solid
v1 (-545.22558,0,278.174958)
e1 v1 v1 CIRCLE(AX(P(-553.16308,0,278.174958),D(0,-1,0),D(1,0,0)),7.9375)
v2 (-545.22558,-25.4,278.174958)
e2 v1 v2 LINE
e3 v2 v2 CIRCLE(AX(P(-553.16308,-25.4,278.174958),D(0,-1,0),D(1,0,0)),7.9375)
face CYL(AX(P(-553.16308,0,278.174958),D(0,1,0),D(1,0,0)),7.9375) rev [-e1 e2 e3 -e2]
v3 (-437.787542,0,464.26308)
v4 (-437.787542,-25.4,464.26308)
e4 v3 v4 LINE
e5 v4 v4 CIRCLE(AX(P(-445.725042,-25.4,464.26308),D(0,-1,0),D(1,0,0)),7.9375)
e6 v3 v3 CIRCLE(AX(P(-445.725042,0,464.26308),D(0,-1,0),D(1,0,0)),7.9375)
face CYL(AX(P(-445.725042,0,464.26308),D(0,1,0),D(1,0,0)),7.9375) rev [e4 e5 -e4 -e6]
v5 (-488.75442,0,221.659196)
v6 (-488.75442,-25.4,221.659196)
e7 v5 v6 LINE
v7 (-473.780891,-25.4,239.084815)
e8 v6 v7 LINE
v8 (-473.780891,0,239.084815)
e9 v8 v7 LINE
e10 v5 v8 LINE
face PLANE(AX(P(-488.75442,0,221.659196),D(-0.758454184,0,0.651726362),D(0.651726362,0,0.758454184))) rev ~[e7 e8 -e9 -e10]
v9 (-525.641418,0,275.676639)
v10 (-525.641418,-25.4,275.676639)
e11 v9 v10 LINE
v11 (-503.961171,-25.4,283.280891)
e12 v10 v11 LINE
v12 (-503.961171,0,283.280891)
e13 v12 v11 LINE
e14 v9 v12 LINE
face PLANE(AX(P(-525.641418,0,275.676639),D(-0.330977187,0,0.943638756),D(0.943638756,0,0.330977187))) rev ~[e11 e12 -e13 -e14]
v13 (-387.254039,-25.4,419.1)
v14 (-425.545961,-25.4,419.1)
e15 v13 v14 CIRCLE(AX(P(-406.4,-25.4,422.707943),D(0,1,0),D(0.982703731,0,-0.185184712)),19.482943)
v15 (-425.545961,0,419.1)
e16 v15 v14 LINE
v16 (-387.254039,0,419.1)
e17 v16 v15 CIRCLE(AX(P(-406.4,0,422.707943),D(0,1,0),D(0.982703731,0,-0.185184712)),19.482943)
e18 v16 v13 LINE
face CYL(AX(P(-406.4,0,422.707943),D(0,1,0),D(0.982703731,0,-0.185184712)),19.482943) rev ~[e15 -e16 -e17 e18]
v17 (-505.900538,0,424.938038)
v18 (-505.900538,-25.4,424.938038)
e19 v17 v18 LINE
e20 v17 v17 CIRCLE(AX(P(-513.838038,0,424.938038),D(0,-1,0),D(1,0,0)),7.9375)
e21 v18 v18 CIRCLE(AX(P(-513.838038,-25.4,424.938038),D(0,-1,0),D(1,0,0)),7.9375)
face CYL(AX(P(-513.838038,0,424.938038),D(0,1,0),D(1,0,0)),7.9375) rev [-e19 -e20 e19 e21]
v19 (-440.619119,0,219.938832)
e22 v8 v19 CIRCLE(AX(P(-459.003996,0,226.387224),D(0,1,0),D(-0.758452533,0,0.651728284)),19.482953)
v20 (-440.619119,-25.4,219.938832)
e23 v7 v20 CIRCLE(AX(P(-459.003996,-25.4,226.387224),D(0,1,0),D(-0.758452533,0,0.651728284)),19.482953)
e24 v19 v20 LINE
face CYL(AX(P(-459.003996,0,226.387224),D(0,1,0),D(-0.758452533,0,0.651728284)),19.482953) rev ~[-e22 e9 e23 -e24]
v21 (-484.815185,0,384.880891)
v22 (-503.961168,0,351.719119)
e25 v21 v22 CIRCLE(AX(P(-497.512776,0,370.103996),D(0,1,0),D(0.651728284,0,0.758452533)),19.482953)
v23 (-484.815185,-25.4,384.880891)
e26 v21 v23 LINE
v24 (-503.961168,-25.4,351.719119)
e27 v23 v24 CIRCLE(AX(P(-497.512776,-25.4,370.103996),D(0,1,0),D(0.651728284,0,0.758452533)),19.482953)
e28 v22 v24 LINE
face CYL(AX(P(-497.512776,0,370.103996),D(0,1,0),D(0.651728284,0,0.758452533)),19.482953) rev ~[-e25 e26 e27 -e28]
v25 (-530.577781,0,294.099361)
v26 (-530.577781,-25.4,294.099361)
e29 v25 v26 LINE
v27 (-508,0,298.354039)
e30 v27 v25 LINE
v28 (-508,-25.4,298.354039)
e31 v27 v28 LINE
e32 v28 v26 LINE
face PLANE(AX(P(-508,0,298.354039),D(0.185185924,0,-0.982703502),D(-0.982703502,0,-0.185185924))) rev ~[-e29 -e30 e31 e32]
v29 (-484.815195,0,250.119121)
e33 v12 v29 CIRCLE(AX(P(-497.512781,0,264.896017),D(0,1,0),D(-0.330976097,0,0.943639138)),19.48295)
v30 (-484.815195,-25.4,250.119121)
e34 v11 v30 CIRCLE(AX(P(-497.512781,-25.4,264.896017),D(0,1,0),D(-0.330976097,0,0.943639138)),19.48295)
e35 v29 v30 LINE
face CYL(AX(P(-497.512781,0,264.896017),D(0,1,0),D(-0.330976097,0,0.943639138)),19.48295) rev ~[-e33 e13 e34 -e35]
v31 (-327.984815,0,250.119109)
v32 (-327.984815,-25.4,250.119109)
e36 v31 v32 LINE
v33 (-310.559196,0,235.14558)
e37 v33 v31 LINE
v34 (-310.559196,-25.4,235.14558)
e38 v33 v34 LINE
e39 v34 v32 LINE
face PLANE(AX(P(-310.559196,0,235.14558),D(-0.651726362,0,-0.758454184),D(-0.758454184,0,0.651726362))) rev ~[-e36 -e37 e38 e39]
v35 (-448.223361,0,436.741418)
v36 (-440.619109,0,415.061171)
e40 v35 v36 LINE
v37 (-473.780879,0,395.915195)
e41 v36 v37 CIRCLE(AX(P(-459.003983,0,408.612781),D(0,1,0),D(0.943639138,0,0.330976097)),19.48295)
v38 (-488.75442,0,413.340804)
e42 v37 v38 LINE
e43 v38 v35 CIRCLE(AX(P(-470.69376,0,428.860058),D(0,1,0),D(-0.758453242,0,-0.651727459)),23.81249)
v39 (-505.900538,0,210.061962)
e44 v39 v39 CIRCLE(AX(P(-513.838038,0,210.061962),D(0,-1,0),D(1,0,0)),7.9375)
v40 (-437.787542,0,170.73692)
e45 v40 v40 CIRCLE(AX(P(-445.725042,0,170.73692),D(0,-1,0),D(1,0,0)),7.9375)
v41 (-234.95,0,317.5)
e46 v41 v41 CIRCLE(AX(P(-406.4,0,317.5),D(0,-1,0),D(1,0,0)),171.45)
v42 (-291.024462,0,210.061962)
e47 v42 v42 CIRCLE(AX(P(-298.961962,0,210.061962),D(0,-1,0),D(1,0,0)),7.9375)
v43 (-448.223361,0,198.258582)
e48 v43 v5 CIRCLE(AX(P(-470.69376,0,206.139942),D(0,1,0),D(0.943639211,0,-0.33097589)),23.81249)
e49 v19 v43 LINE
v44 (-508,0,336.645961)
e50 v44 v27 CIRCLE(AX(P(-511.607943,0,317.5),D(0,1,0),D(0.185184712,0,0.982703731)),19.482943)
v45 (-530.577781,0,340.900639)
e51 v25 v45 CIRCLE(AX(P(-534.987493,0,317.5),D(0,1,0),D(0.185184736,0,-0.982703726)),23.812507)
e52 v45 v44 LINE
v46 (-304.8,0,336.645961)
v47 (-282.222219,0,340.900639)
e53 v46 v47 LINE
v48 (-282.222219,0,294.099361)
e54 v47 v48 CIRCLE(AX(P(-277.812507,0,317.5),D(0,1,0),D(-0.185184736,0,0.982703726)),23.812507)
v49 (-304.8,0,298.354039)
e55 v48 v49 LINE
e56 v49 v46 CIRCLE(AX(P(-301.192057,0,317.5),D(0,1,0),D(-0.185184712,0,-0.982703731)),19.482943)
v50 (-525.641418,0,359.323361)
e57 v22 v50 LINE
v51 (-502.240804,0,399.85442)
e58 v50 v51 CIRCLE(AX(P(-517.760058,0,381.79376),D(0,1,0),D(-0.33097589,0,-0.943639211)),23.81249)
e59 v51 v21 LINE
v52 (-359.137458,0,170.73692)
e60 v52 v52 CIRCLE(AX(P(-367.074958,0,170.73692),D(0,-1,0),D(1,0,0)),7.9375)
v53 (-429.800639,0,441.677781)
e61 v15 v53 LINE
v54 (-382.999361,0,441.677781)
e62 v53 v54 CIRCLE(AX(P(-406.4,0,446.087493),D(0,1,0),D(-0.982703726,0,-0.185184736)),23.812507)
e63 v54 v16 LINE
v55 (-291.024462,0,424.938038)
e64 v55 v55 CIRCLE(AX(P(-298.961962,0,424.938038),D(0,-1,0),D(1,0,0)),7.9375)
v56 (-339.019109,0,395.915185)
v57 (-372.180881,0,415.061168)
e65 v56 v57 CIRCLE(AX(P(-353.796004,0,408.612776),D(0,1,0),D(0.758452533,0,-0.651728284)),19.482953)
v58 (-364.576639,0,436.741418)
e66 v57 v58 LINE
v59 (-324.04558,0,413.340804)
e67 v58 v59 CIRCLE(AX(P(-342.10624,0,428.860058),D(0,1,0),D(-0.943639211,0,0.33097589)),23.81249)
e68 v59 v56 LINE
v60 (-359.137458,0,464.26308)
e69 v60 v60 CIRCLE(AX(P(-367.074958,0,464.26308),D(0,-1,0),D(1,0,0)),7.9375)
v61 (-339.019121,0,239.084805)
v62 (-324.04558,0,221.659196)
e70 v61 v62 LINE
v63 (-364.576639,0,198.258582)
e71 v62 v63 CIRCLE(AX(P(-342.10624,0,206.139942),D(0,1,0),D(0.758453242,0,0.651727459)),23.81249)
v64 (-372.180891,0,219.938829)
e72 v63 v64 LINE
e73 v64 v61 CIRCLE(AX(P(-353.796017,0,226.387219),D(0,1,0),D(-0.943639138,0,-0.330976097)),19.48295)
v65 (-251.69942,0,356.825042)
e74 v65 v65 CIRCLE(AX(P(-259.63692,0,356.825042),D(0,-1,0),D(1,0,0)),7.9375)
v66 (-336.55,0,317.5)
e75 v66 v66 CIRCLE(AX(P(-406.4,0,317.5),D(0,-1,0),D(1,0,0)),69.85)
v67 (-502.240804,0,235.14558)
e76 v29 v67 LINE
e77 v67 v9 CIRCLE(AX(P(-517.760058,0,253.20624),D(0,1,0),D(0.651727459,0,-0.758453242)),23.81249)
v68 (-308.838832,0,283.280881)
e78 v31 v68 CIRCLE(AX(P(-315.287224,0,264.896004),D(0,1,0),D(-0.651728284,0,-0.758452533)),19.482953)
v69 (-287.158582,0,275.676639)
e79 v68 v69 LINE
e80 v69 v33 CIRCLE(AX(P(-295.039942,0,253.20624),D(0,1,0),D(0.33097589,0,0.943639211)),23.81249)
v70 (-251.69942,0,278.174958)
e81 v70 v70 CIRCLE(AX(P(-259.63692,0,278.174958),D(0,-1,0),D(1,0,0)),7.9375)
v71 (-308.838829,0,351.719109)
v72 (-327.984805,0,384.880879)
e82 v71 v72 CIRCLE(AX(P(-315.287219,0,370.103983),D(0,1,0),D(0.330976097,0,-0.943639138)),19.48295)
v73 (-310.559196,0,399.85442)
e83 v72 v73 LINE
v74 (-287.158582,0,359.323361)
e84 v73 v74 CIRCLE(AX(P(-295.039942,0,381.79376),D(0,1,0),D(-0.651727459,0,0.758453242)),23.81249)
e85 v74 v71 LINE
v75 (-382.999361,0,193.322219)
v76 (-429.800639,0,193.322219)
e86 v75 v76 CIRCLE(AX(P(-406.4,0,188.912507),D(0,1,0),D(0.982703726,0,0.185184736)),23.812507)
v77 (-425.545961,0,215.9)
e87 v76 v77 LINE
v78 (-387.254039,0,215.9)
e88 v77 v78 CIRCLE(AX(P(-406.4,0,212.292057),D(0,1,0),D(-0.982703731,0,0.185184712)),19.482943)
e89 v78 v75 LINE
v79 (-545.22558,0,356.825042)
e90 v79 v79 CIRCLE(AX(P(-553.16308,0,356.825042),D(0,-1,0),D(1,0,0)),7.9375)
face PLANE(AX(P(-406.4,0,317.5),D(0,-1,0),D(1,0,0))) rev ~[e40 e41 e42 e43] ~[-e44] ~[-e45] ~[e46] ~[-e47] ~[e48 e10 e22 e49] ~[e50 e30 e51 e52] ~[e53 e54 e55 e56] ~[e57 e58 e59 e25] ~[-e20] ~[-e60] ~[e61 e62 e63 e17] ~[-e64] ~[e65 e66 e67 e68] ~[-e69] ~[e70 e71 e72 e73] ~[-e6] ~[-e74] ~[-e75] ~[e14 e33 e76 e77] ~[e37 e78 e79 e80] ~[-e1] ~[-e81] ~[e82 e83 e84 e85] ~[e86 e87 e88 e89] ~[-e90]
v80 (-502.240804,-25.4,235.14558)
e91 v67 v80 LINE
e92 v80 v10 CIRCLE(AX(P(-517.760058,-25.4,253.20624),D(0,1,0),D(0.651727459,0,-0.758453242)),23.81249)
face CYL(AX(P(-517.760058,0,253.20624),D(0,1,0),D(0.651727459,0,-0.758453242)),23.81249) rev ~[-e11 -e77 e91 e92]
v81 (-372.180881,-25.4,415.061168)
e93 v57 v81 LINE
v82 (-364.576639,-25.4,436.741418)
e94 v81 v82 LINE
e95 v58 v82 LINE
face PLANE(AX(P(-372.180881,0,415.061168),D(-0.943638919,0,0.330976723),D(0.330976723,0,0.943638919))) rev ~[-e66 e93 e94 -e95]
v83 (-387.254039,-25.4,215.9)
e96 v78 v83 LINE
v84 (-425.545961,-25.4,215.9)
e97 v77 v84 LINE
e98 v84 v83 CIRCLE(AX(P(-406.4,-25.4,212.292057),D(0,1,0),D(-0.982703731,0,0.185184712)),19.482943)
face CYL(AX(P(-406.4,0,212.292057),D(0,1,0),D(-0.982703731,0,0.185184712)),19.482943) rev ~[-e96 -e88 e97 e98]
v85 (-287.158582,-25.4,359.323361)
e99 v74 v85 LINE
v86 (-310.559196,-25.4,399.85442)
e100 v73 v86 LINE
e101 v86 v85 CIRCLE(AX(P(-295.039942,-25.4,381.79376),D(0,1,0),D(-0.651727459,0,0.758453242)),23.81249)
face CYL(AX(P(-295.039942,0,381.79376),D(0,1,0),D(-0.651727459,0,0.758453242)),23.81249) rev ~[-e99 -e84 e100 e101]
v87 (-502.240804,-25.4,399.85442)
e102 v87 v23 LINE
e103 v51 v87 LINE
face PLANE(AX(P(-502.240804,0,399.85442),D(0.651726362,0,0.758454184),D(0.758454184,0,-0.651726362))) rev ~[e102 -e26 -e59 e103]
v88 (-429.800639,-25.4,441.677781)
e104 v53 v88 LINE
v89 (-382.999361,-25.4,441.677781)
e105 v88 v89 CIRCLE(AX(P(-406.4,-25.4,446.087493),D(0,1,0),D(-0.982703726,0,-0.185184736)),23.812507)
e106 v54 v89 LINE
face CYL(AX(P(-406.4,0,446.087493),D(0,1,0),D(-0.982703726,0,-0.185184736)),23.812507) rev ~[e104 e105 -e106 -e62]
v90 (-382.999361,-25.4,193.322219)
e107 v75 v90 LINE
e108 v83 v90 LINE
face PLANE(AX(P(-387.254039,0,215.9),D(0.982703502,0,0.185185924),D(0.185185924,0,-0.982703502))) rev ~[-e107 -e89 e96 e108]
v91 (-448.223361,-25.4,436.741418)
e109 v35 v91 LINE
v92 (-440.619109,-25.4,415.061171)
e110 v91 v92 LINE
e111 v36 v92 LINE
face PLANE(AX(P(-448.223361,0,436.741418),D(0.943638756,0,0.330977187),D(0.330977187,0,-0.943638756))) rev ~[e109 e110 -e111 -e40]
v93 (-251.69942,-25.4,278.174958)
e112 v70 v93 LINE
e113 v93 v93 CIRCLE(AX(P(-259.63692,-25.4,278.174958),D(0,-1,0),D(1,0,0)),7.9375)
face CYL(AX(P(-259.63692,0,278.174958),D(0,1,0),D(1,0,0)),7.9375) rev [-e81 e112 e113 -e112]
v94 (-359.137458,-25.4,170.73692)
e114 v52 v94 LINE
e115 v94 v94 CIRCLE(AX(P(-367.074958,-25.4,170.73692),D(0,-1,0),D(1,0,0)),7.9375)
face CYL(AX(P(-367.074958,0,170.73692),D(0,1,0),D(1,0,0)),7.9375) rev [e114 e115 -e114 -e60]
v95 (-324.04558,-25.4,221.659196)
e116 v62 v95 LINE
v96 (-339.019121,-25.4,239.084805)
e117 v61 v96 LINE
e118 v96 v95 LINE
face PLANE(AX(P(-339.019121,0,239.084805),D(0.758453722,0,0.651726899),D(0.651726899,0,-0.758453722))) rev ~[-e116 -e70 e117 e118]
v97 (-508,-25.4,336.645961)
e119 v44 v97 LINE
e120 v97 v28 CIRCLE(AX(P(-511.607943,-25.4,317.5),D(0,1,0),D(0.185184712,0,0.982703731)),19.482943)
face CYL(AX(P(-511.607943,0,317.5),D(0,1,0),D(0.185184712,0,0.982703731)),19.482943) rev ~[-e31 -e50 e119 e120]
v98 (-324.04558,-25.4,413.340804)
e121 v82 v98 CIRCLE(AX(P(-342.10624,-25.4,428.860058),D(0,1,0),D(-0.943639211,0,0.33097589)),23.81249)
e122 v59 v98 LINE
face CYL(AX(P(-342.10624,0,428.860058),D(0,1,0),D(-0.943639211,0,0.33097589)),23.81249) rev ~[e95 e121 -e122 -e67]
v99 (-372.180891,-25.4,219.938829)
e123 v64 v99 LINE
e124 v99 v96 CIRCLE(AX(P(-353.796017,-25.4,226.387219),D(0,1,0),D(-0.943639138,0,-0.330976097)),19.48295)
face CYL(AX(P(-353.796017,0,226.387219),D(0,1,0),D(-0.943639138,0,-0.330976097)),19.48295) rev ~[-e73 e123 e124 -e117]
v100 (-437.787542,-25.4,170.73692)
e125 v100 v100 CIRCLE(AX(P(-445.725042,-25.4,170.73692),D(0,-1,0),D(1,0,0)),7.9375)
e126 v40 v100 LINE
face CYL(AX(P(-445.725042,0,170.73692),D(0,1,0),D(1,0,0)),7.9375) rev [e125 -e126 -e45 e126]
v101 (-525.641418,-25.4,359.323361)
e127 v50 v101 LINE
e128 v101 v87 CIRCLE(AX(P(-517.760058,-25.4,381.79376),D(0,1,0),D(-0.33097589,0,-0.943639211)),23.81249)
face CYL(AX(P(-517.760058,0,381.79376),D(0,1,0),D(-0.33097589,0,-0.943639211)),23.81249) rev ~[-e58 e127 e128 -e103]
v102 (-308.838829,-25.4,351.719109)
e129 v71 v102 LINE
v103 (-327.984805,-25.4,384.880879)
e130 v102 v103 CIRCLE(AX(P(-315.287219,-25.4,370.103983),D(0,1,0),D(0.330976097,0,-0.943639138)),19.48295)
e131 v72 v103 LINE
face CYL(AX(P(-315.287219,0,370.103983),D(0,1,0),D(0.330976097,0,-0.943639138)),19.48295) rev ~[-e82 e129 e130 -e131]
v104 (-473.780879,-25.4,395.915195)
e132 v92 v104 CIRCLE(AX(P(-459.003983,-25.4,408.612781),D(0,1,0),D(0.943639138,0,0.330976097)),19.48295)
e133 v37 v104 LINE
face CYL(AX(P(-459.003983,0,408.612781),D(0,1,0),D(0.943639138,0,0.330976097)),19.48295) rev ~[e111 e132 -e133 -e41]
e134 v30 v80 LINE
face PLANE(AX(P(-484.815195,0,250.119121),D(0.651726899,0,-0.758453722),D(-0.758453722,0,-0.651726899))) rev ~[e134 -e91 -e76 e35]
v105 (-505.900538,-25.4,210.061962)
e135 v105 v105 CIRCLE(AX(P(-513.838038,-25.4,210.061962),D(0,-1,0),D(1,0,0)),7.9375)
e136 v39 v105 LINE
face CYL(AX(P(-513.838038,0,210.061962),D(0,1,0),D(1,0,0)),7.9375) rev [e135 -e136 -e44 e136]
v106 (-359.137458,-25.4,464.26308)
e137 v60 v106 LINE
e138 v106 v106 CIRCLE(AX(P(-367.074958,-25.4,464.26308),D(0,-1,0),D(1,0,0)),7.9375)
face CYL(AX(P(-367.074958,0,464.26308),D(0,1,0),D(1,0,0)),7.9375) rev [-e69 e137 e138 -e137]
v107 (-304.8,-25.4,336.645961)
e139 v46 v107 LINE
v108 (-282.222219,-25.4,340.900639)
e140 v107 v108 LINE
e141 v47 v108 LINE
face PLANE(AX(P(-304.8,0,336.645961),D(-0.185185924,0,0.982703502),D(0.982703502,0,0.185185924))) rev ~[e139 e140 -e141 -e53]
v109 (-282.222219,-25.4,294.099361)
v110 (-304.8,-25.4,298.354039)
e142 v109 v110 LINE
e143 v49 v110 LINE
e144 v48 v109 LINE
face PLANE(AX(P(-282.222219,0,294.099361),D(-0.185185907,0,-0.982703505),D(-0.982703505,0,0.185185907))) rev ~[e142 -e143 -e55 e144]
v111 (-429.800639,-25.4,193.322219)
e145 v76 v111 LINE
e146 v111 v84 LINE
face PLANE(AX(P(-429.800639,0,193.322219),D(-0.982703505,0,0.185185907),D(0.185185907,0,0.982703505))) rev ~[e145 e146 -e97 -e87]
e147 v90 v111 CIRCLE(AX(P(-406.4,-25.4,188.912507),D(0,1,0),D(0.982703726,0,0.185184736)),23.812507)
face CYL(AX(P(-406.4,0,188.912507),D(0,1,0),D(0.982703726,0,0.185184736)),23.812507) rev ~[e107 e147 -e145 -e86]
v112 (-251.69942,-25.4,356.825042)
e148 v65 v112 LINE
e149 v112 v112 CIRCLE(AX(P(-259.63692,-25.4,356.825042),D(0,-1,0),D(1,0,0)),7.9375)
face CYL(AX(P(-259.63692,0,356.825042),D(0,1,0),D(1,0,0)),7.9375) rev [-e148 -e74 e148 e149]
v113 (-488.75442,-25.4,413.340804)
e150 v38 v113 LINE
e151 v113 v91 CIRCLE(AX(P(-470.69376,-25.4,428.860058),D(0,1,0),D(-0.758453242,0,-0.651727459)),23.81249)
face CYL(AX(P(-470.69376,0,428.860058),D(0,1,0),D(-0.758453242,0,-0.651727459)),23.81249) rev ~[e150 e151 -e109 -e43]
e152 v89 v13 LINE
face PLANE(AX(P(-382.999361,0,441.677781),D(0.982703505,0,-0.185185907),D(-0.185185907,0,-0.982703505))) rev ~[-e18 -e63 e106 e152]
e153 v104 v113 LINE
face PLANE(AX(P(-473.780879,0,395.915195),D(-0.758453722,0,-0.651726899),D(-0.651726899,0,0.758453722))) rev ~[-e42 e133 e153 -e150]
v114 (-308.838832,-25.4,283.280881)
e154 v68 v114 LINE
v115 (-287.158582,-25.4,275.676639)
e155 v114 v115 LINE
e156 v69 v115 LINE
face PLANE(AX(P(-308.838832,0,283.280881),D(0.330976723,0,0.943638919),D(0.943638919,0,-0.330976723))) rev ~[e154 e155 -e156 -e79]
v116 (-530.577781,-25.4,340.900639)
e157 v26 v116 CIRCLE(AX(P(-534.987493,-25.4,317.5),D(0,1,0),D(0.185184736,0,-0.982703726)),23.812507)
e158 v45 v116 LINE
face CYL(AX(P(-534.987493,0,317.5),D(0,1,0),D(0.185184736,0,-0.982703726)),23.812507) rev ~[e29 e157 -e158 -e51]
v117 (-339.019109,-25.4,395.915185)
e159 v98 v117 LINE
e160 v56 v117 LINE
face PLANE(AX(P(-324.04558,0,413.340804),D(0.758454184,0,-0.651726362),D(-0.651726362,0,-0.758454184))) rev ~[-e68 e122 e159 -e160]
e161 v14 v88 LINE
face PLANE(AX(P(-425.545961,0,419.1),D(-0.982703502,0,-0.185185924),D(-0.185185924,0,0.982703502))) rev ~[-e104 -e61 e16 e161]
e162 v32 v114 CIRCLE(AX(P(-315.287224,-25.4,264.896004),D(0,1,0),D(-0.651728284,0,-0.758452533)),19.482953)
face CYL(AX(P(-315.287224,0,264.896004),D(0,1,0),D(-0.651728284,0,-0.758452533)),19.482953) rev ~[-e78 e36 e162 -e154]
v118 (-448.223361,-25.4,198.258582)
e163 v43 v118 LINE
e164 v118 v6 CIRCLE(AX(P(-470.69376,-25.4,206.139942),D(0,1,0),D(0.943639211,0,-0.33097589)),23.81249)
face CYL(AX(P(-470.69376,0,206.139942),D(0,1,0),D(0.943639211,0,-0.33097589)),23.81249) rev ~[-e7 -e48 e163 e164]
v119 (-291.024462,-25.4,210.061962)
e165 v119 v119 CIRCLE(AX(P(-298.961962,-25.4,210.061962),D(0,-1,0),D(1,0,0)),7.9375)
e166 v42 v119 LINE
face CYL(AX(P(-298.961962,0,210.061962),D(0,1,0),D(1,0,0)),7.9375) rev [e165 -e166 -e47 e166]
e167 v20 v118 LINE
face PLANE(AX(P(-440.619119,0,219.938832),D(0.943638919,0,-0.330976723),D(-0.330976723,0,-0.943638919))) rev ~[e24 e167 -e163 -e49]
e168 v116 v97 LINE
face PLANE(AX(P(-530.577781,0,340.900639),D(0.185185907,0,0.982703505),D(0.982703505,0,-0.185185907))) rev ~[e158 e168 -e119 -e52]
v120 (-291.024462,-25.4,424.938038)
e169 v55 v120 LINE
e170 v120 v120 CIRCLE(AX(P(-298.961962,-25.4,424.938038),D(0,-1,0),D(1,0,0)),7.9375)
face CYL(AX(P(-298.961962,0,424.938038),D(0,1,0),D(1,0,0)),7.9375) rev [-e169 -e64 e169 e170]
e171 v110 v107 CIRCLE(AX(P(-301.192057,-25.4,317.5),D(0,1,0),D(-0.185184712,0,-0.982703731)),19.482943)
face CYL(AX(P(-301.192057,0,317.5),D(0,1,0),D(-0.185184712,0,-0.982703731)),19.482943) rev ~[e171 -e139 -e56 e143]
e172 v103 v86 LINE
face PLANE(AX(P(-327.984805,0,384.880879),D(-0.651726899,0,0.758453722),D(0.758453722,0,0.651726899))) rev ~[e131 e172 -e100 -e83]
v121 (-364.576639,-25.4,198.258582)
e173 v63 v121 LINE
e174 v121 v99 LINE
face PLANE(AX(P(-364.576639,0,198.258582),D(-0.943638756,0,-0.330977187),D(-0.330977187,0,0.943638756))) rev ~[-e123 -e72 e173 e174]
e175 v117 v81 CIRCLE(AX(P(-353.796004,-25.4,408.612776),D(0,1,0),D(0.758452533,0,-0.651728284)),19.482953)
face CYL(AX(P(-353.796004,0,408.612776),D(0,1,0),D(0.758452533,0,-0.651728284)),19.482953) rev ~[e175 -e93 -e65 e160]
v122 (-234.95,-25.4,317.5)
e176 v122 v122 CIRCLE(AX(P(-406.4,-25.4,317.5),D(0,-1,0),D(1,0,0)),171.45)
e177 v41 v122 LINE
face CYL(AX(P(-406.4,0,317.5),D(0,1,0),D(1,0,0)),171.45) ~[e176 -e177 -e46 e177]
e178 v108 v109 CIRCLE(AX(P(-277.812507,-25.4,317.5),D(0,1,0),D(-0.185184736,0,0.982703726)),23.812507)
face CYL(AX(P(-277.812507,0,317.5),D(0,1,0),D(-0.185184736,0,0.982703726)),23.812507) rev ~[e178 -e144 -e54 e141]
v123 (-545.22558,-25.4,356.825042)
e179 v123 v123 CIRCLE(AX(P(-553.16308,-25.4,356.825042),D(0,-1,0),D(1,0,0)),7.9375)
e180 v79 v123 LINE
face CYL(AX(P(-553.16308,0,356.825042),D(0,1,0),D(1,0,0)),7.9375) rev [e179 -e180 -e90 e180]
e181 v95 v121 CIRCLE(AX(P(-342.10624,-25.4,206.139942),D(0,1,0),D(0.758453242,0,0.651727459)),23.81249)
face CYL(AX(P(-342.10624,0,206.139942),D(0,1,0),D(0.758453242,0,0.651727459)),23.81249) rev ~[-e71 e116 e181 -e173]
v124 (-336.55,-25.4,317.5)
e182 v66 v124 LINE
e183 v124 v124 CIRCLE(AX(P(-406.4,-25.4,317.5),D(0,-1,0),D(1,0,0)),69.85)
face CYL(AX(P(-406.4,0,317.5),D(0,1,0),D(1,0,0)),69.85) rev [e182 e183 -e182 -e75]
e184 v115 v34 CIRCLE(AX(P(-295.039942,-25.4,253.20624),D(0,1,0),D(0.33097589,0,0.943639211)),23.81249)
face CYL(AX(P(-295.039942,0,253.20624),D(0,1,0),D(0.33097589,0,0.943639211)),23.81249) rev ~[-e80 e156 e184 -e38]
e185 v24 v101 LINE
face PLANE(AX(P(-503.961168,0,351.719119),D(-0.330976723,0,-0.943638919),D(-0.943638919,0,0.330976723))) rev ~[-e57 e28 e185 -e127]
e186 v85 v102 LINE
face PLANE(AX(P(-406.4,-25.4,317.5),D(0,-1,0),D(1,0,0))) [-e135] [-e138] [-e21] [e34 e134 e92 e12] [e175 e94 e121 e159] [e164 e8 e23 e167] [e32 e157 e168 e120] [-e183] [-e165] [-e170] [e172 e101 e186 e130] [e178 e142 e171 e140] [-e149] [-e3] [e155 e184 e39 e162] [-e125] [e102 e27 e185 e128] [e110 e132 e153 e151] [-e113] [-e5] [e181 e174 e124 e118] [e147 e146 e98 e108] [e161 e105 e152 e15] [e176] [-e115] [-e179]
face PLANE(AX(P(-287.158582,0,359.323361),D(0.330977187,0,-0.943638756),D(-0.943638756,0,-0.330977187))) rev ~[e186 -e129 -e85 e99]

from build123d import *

# Parameters (mm, degrees)
F0_R     = 171.45
F0_R_2   = 7.9375
F0_R_3   = 69.85
F1_DEPTH = 25.4


# Not quite as in the source:
# - ends of sketch curves that miss each other by under 0.0002 mm in the source are joined


with BuildPart() as f1:
    # F0 (on Front) → F1 (new body)
    with BuildSketch(Plane.XZ):
        with Locations((-406.4, 317.5)):
            Circle(F0_R)
        with Locations((-513.8380376, 210.0619624)):
            Circle(F0_R_2, mode=Mode.SUBTRACT)
        with BuildLine():
            Line((-488.75442, 221.659196), (-473.7808914, 239.0848152))
            ThreePointArc((-473.7808914, 239.0848152), (-449.2625045681, 243.2599470835), (-440.6191192625, 219.9388323398))
            Line((-440.6191192625, 219.9388323398), (-448.2233606, 198.2585824))
            ThreePointArc((-448.2233606, 198.2585824), (-482.5999974139, 185.5177169793), (-488.75442, 221.659196))
        make_face(mode=Mode.SUBTRACT)
        with Locations((-553.1630796, 278.174958)):
            Circle(F0_R_2, mode=Mode.SUBTRACT)
        with BuildLine():
            Line((-525.6414176, 275.6766394), (-503.9611714, 283.2808914))
            ThreePointArc((-503.9611714, 283.2808914), (-480.6400529165, 274.6374954319), (-484.8151954053, 250.119120942))
            Line((-484.8151954053, 250.119120942), (-502.240804, 235.14558))
            ThreePointArc((-502.240804, 235.14558), (-538.3822830207, 241.3000025861), (-525.6414176, 275.6766394))
        make_face(mode=Mode.SUBTRACT)
        with Locations((-445.725042, 170.7369204)):
            Circle(F0_R_2, mode=Mode.SUBTRACT)
        with BuildLine():
            Line((-429.800639, 193.3222194), (-425.5459612, 215.9))
            ThreePointArc((-425.5459612, 215.9), (-406.4, 231.775), (-387.2540391788, 215.8999999286))
            Line((-387.2540391788, 215.8999999286), (-382.999361, 193.3222194))
            ThreePointArc((-382.999361, 193.3222194), (-406.4, 165.1), (-429.800639, 193.3222194))
        make_face(mode=Mode.SUBTRACT)
        with Locations((-367.074958, 170.7369204)):
            Circle(F0_R_2, mode=Mode.SUBTRACT)
        with BuildLine():
            Line((-364.5766394, 198.2585824), (-372.1808914, 219.9388286))
            ThreePointArc((-372.1808914, 219.9388286), (-363.5374954319, 243.2599470835), (-339.019120942, 239.0848045947))
            Line((-339.019120942, 239.0848045947), (-324.04558, 221.659196))
            ThreePointArc((-324.04558, 221.659196), (-330.2000025861, 185.5177169793), (-364.5766394, 198.2585824))
        make_face(mode=Mode.SUBTRACT)
        with Locations((-298.9619624, 210.0619624)):
            Circle(F0_R_2, mode=Mode.SUBTRACT)
        with BuildLine():
            Line((-310.559196, 235.14558), (-327.9848152, 250.1191086))
            ThreePointArc((-327.9848152, 250.1191086), (-332.1599470835, 274.6374954319), (-308.8388323398, 283.2808807375))
            Line((-308.8388323398, 283.2808807375), (-287.1585824, 275.6766394))
            ThreePointArc((-287.1585824, 275.6766394), (-274.4177169793, 241.3000025861), (-310.559196, 235.14558))
        make_face(mode=Mode.SUBTRACT)
        with Locations((-259.6369204, 278.174958)):
            Circle(F0_R_2, mode=Mode.SUBTRACT)
        with Locations((-553.1630796, 356.825042)):
            Circle(F0_R_2, mode=Mode.SUBTRACT)
        with BuildLine():
            Line((-530.5777806, 340.900639), (-508, 336.6459612))
            ThreePointArc((-508, 336.6459612), (-492.125, 317.5), (-508.0000000714, 298.3540391788))
            Line((-508.0000000714, 298.3540391788), (-530.5777806, 294.099361))
            ThreePointArc((-530.5777806, 294.099361), (-558.8, 317.5), (-530.5777806, 340.900639))
        make_face(mode=Mode.SUBTRACT)
        with BuildLine():
            Line((-502.240804, 399.85442), (-484.8151848, 384.8808914))
            ThreePointArc((-484.8151848, 384.8808914), (-480.6400529165, 360.3625045681), (-503.9611676602, 351.7191192625))
            Line((-503.9611676602, 351.7191192625), (-525.6414176, 359.3233606))
            ThreePointArc((-525.6414176, 359.3233606), (-538.3822830207, 393.6999974139), (-502.240804, 399.85442))
        make_face(mode=Mode.SUBTRACT)
        with Locations((-513.8380376, 424.9380376)):
            Circle(F0_R_2, mode=Mode.SUBTRACT)
        with BuildLine():
            Line((-448.2233606, 436.7414176), (-440.6191086, 415.0611714))
            ThreePointArc((-440.6191086, 415.0611714), (-449.2625045681, 391.7400529165), (-473.780879058, 395.9151954053))
            Line((-473.780879058, 395.9151954053), (-488.75442, 413.340804))
            ThreePointArc((-488.75442, 413.340804), (-482.5999974139, 449.4822830207), (-448.2233606, 436.7414176))
        make_face(mode=Mode.SUBTRACT)
        with Locations((-406.4, 317.5)):
            Circle(F0_R_3, mode=Mode.SUBTRACT)
        with BuildLine():
            Line((-382.999361, 441.6777806), (-387.2540388, 419.1))
            ThreePointArc((-387.2540388, 419.1), (-406.4, 403.225), (-425.5459608212, 419.1000000714))
            Line((-425.5459608212, 419.1000000714), (-429.800639, 441.6777806))
            ThreePointArc((-429.800639, 441.6777806), (-406.4, 469.9), (-382.999361, 441.6777806))
        make_face(mode=Mode.SUBTRACT)
        with BuildLine():
            Line((-324.04558, 413.340804), (-339.0191086, 395.9151848))
            ThreePointArc((-339.0191086, 395.9151848), (-363.5374954319, 391.7400529165), (-372.1808807375, 415.0611676602))
            Line((-372.1808807375, 415.0611676602), (-364.5766394, 436.7414176))
            ThreePointArc((-364.5766394, 436.7414176), (-330.2000025861, 449.4822830207), (-324.04558, 413.340804))
        make_face(mode=Mode.SUBTRACT)
        with Locations((-445.725042, 464.2630796)):
            Circle(F0_R_2, mode=Mode.SUBTRACT)
        with Locations((-367.074958, 464.2630796)):
            Circle(F0_R_2, mode=Mode.SUBTRACT)
        with BuildLine():
            Line((-282.2222194, 294.099361), (-304.8, 298.3540388))
            ThreePointArc((-304.8, 298.3540388), (-320.675, 317.5), (-304.7999999286, 336.6459608212))
            Line((-304.7999999286, 336.6459608212), (-282.2222194, 340.900639))
            ThreePointArc((-282.2222194, 340.900639), (-254, 317.5), (-282.2222194, 294.099361))
        make_face(mode=Mode.SUBTRACT)
        with BuildLine():
            Line((-287.1585824, 359.3233606), (-308.8388286, 351.7191086))
            ThreePointArc((-308.8388286, 351.7191086), (-332.1599470835, 360.3625045681), (-327.9848045947, 384.880879058))
            Line((-327.9848045947, 384.880879058), (-310.559196, 399.85442))
            ThreePointArc((-310.559196, 399.85442), (-274.4177169793, 393.6999974139), (-287.1585824, 359.3233606))
        make_face(mode=Mode.SUBTRACT)
        with Locations((-259.6369204, 356.825042)):
            Circle(F0_R_2, mode=Mode.SUBTRACT)
        with Locations((-298.9619624, 424.9380376)):
            Circle(F0_R_2, mode=Mode.SUBTRACT)
    extrude(amount=F1_DEPTH)


solid = f1.part
